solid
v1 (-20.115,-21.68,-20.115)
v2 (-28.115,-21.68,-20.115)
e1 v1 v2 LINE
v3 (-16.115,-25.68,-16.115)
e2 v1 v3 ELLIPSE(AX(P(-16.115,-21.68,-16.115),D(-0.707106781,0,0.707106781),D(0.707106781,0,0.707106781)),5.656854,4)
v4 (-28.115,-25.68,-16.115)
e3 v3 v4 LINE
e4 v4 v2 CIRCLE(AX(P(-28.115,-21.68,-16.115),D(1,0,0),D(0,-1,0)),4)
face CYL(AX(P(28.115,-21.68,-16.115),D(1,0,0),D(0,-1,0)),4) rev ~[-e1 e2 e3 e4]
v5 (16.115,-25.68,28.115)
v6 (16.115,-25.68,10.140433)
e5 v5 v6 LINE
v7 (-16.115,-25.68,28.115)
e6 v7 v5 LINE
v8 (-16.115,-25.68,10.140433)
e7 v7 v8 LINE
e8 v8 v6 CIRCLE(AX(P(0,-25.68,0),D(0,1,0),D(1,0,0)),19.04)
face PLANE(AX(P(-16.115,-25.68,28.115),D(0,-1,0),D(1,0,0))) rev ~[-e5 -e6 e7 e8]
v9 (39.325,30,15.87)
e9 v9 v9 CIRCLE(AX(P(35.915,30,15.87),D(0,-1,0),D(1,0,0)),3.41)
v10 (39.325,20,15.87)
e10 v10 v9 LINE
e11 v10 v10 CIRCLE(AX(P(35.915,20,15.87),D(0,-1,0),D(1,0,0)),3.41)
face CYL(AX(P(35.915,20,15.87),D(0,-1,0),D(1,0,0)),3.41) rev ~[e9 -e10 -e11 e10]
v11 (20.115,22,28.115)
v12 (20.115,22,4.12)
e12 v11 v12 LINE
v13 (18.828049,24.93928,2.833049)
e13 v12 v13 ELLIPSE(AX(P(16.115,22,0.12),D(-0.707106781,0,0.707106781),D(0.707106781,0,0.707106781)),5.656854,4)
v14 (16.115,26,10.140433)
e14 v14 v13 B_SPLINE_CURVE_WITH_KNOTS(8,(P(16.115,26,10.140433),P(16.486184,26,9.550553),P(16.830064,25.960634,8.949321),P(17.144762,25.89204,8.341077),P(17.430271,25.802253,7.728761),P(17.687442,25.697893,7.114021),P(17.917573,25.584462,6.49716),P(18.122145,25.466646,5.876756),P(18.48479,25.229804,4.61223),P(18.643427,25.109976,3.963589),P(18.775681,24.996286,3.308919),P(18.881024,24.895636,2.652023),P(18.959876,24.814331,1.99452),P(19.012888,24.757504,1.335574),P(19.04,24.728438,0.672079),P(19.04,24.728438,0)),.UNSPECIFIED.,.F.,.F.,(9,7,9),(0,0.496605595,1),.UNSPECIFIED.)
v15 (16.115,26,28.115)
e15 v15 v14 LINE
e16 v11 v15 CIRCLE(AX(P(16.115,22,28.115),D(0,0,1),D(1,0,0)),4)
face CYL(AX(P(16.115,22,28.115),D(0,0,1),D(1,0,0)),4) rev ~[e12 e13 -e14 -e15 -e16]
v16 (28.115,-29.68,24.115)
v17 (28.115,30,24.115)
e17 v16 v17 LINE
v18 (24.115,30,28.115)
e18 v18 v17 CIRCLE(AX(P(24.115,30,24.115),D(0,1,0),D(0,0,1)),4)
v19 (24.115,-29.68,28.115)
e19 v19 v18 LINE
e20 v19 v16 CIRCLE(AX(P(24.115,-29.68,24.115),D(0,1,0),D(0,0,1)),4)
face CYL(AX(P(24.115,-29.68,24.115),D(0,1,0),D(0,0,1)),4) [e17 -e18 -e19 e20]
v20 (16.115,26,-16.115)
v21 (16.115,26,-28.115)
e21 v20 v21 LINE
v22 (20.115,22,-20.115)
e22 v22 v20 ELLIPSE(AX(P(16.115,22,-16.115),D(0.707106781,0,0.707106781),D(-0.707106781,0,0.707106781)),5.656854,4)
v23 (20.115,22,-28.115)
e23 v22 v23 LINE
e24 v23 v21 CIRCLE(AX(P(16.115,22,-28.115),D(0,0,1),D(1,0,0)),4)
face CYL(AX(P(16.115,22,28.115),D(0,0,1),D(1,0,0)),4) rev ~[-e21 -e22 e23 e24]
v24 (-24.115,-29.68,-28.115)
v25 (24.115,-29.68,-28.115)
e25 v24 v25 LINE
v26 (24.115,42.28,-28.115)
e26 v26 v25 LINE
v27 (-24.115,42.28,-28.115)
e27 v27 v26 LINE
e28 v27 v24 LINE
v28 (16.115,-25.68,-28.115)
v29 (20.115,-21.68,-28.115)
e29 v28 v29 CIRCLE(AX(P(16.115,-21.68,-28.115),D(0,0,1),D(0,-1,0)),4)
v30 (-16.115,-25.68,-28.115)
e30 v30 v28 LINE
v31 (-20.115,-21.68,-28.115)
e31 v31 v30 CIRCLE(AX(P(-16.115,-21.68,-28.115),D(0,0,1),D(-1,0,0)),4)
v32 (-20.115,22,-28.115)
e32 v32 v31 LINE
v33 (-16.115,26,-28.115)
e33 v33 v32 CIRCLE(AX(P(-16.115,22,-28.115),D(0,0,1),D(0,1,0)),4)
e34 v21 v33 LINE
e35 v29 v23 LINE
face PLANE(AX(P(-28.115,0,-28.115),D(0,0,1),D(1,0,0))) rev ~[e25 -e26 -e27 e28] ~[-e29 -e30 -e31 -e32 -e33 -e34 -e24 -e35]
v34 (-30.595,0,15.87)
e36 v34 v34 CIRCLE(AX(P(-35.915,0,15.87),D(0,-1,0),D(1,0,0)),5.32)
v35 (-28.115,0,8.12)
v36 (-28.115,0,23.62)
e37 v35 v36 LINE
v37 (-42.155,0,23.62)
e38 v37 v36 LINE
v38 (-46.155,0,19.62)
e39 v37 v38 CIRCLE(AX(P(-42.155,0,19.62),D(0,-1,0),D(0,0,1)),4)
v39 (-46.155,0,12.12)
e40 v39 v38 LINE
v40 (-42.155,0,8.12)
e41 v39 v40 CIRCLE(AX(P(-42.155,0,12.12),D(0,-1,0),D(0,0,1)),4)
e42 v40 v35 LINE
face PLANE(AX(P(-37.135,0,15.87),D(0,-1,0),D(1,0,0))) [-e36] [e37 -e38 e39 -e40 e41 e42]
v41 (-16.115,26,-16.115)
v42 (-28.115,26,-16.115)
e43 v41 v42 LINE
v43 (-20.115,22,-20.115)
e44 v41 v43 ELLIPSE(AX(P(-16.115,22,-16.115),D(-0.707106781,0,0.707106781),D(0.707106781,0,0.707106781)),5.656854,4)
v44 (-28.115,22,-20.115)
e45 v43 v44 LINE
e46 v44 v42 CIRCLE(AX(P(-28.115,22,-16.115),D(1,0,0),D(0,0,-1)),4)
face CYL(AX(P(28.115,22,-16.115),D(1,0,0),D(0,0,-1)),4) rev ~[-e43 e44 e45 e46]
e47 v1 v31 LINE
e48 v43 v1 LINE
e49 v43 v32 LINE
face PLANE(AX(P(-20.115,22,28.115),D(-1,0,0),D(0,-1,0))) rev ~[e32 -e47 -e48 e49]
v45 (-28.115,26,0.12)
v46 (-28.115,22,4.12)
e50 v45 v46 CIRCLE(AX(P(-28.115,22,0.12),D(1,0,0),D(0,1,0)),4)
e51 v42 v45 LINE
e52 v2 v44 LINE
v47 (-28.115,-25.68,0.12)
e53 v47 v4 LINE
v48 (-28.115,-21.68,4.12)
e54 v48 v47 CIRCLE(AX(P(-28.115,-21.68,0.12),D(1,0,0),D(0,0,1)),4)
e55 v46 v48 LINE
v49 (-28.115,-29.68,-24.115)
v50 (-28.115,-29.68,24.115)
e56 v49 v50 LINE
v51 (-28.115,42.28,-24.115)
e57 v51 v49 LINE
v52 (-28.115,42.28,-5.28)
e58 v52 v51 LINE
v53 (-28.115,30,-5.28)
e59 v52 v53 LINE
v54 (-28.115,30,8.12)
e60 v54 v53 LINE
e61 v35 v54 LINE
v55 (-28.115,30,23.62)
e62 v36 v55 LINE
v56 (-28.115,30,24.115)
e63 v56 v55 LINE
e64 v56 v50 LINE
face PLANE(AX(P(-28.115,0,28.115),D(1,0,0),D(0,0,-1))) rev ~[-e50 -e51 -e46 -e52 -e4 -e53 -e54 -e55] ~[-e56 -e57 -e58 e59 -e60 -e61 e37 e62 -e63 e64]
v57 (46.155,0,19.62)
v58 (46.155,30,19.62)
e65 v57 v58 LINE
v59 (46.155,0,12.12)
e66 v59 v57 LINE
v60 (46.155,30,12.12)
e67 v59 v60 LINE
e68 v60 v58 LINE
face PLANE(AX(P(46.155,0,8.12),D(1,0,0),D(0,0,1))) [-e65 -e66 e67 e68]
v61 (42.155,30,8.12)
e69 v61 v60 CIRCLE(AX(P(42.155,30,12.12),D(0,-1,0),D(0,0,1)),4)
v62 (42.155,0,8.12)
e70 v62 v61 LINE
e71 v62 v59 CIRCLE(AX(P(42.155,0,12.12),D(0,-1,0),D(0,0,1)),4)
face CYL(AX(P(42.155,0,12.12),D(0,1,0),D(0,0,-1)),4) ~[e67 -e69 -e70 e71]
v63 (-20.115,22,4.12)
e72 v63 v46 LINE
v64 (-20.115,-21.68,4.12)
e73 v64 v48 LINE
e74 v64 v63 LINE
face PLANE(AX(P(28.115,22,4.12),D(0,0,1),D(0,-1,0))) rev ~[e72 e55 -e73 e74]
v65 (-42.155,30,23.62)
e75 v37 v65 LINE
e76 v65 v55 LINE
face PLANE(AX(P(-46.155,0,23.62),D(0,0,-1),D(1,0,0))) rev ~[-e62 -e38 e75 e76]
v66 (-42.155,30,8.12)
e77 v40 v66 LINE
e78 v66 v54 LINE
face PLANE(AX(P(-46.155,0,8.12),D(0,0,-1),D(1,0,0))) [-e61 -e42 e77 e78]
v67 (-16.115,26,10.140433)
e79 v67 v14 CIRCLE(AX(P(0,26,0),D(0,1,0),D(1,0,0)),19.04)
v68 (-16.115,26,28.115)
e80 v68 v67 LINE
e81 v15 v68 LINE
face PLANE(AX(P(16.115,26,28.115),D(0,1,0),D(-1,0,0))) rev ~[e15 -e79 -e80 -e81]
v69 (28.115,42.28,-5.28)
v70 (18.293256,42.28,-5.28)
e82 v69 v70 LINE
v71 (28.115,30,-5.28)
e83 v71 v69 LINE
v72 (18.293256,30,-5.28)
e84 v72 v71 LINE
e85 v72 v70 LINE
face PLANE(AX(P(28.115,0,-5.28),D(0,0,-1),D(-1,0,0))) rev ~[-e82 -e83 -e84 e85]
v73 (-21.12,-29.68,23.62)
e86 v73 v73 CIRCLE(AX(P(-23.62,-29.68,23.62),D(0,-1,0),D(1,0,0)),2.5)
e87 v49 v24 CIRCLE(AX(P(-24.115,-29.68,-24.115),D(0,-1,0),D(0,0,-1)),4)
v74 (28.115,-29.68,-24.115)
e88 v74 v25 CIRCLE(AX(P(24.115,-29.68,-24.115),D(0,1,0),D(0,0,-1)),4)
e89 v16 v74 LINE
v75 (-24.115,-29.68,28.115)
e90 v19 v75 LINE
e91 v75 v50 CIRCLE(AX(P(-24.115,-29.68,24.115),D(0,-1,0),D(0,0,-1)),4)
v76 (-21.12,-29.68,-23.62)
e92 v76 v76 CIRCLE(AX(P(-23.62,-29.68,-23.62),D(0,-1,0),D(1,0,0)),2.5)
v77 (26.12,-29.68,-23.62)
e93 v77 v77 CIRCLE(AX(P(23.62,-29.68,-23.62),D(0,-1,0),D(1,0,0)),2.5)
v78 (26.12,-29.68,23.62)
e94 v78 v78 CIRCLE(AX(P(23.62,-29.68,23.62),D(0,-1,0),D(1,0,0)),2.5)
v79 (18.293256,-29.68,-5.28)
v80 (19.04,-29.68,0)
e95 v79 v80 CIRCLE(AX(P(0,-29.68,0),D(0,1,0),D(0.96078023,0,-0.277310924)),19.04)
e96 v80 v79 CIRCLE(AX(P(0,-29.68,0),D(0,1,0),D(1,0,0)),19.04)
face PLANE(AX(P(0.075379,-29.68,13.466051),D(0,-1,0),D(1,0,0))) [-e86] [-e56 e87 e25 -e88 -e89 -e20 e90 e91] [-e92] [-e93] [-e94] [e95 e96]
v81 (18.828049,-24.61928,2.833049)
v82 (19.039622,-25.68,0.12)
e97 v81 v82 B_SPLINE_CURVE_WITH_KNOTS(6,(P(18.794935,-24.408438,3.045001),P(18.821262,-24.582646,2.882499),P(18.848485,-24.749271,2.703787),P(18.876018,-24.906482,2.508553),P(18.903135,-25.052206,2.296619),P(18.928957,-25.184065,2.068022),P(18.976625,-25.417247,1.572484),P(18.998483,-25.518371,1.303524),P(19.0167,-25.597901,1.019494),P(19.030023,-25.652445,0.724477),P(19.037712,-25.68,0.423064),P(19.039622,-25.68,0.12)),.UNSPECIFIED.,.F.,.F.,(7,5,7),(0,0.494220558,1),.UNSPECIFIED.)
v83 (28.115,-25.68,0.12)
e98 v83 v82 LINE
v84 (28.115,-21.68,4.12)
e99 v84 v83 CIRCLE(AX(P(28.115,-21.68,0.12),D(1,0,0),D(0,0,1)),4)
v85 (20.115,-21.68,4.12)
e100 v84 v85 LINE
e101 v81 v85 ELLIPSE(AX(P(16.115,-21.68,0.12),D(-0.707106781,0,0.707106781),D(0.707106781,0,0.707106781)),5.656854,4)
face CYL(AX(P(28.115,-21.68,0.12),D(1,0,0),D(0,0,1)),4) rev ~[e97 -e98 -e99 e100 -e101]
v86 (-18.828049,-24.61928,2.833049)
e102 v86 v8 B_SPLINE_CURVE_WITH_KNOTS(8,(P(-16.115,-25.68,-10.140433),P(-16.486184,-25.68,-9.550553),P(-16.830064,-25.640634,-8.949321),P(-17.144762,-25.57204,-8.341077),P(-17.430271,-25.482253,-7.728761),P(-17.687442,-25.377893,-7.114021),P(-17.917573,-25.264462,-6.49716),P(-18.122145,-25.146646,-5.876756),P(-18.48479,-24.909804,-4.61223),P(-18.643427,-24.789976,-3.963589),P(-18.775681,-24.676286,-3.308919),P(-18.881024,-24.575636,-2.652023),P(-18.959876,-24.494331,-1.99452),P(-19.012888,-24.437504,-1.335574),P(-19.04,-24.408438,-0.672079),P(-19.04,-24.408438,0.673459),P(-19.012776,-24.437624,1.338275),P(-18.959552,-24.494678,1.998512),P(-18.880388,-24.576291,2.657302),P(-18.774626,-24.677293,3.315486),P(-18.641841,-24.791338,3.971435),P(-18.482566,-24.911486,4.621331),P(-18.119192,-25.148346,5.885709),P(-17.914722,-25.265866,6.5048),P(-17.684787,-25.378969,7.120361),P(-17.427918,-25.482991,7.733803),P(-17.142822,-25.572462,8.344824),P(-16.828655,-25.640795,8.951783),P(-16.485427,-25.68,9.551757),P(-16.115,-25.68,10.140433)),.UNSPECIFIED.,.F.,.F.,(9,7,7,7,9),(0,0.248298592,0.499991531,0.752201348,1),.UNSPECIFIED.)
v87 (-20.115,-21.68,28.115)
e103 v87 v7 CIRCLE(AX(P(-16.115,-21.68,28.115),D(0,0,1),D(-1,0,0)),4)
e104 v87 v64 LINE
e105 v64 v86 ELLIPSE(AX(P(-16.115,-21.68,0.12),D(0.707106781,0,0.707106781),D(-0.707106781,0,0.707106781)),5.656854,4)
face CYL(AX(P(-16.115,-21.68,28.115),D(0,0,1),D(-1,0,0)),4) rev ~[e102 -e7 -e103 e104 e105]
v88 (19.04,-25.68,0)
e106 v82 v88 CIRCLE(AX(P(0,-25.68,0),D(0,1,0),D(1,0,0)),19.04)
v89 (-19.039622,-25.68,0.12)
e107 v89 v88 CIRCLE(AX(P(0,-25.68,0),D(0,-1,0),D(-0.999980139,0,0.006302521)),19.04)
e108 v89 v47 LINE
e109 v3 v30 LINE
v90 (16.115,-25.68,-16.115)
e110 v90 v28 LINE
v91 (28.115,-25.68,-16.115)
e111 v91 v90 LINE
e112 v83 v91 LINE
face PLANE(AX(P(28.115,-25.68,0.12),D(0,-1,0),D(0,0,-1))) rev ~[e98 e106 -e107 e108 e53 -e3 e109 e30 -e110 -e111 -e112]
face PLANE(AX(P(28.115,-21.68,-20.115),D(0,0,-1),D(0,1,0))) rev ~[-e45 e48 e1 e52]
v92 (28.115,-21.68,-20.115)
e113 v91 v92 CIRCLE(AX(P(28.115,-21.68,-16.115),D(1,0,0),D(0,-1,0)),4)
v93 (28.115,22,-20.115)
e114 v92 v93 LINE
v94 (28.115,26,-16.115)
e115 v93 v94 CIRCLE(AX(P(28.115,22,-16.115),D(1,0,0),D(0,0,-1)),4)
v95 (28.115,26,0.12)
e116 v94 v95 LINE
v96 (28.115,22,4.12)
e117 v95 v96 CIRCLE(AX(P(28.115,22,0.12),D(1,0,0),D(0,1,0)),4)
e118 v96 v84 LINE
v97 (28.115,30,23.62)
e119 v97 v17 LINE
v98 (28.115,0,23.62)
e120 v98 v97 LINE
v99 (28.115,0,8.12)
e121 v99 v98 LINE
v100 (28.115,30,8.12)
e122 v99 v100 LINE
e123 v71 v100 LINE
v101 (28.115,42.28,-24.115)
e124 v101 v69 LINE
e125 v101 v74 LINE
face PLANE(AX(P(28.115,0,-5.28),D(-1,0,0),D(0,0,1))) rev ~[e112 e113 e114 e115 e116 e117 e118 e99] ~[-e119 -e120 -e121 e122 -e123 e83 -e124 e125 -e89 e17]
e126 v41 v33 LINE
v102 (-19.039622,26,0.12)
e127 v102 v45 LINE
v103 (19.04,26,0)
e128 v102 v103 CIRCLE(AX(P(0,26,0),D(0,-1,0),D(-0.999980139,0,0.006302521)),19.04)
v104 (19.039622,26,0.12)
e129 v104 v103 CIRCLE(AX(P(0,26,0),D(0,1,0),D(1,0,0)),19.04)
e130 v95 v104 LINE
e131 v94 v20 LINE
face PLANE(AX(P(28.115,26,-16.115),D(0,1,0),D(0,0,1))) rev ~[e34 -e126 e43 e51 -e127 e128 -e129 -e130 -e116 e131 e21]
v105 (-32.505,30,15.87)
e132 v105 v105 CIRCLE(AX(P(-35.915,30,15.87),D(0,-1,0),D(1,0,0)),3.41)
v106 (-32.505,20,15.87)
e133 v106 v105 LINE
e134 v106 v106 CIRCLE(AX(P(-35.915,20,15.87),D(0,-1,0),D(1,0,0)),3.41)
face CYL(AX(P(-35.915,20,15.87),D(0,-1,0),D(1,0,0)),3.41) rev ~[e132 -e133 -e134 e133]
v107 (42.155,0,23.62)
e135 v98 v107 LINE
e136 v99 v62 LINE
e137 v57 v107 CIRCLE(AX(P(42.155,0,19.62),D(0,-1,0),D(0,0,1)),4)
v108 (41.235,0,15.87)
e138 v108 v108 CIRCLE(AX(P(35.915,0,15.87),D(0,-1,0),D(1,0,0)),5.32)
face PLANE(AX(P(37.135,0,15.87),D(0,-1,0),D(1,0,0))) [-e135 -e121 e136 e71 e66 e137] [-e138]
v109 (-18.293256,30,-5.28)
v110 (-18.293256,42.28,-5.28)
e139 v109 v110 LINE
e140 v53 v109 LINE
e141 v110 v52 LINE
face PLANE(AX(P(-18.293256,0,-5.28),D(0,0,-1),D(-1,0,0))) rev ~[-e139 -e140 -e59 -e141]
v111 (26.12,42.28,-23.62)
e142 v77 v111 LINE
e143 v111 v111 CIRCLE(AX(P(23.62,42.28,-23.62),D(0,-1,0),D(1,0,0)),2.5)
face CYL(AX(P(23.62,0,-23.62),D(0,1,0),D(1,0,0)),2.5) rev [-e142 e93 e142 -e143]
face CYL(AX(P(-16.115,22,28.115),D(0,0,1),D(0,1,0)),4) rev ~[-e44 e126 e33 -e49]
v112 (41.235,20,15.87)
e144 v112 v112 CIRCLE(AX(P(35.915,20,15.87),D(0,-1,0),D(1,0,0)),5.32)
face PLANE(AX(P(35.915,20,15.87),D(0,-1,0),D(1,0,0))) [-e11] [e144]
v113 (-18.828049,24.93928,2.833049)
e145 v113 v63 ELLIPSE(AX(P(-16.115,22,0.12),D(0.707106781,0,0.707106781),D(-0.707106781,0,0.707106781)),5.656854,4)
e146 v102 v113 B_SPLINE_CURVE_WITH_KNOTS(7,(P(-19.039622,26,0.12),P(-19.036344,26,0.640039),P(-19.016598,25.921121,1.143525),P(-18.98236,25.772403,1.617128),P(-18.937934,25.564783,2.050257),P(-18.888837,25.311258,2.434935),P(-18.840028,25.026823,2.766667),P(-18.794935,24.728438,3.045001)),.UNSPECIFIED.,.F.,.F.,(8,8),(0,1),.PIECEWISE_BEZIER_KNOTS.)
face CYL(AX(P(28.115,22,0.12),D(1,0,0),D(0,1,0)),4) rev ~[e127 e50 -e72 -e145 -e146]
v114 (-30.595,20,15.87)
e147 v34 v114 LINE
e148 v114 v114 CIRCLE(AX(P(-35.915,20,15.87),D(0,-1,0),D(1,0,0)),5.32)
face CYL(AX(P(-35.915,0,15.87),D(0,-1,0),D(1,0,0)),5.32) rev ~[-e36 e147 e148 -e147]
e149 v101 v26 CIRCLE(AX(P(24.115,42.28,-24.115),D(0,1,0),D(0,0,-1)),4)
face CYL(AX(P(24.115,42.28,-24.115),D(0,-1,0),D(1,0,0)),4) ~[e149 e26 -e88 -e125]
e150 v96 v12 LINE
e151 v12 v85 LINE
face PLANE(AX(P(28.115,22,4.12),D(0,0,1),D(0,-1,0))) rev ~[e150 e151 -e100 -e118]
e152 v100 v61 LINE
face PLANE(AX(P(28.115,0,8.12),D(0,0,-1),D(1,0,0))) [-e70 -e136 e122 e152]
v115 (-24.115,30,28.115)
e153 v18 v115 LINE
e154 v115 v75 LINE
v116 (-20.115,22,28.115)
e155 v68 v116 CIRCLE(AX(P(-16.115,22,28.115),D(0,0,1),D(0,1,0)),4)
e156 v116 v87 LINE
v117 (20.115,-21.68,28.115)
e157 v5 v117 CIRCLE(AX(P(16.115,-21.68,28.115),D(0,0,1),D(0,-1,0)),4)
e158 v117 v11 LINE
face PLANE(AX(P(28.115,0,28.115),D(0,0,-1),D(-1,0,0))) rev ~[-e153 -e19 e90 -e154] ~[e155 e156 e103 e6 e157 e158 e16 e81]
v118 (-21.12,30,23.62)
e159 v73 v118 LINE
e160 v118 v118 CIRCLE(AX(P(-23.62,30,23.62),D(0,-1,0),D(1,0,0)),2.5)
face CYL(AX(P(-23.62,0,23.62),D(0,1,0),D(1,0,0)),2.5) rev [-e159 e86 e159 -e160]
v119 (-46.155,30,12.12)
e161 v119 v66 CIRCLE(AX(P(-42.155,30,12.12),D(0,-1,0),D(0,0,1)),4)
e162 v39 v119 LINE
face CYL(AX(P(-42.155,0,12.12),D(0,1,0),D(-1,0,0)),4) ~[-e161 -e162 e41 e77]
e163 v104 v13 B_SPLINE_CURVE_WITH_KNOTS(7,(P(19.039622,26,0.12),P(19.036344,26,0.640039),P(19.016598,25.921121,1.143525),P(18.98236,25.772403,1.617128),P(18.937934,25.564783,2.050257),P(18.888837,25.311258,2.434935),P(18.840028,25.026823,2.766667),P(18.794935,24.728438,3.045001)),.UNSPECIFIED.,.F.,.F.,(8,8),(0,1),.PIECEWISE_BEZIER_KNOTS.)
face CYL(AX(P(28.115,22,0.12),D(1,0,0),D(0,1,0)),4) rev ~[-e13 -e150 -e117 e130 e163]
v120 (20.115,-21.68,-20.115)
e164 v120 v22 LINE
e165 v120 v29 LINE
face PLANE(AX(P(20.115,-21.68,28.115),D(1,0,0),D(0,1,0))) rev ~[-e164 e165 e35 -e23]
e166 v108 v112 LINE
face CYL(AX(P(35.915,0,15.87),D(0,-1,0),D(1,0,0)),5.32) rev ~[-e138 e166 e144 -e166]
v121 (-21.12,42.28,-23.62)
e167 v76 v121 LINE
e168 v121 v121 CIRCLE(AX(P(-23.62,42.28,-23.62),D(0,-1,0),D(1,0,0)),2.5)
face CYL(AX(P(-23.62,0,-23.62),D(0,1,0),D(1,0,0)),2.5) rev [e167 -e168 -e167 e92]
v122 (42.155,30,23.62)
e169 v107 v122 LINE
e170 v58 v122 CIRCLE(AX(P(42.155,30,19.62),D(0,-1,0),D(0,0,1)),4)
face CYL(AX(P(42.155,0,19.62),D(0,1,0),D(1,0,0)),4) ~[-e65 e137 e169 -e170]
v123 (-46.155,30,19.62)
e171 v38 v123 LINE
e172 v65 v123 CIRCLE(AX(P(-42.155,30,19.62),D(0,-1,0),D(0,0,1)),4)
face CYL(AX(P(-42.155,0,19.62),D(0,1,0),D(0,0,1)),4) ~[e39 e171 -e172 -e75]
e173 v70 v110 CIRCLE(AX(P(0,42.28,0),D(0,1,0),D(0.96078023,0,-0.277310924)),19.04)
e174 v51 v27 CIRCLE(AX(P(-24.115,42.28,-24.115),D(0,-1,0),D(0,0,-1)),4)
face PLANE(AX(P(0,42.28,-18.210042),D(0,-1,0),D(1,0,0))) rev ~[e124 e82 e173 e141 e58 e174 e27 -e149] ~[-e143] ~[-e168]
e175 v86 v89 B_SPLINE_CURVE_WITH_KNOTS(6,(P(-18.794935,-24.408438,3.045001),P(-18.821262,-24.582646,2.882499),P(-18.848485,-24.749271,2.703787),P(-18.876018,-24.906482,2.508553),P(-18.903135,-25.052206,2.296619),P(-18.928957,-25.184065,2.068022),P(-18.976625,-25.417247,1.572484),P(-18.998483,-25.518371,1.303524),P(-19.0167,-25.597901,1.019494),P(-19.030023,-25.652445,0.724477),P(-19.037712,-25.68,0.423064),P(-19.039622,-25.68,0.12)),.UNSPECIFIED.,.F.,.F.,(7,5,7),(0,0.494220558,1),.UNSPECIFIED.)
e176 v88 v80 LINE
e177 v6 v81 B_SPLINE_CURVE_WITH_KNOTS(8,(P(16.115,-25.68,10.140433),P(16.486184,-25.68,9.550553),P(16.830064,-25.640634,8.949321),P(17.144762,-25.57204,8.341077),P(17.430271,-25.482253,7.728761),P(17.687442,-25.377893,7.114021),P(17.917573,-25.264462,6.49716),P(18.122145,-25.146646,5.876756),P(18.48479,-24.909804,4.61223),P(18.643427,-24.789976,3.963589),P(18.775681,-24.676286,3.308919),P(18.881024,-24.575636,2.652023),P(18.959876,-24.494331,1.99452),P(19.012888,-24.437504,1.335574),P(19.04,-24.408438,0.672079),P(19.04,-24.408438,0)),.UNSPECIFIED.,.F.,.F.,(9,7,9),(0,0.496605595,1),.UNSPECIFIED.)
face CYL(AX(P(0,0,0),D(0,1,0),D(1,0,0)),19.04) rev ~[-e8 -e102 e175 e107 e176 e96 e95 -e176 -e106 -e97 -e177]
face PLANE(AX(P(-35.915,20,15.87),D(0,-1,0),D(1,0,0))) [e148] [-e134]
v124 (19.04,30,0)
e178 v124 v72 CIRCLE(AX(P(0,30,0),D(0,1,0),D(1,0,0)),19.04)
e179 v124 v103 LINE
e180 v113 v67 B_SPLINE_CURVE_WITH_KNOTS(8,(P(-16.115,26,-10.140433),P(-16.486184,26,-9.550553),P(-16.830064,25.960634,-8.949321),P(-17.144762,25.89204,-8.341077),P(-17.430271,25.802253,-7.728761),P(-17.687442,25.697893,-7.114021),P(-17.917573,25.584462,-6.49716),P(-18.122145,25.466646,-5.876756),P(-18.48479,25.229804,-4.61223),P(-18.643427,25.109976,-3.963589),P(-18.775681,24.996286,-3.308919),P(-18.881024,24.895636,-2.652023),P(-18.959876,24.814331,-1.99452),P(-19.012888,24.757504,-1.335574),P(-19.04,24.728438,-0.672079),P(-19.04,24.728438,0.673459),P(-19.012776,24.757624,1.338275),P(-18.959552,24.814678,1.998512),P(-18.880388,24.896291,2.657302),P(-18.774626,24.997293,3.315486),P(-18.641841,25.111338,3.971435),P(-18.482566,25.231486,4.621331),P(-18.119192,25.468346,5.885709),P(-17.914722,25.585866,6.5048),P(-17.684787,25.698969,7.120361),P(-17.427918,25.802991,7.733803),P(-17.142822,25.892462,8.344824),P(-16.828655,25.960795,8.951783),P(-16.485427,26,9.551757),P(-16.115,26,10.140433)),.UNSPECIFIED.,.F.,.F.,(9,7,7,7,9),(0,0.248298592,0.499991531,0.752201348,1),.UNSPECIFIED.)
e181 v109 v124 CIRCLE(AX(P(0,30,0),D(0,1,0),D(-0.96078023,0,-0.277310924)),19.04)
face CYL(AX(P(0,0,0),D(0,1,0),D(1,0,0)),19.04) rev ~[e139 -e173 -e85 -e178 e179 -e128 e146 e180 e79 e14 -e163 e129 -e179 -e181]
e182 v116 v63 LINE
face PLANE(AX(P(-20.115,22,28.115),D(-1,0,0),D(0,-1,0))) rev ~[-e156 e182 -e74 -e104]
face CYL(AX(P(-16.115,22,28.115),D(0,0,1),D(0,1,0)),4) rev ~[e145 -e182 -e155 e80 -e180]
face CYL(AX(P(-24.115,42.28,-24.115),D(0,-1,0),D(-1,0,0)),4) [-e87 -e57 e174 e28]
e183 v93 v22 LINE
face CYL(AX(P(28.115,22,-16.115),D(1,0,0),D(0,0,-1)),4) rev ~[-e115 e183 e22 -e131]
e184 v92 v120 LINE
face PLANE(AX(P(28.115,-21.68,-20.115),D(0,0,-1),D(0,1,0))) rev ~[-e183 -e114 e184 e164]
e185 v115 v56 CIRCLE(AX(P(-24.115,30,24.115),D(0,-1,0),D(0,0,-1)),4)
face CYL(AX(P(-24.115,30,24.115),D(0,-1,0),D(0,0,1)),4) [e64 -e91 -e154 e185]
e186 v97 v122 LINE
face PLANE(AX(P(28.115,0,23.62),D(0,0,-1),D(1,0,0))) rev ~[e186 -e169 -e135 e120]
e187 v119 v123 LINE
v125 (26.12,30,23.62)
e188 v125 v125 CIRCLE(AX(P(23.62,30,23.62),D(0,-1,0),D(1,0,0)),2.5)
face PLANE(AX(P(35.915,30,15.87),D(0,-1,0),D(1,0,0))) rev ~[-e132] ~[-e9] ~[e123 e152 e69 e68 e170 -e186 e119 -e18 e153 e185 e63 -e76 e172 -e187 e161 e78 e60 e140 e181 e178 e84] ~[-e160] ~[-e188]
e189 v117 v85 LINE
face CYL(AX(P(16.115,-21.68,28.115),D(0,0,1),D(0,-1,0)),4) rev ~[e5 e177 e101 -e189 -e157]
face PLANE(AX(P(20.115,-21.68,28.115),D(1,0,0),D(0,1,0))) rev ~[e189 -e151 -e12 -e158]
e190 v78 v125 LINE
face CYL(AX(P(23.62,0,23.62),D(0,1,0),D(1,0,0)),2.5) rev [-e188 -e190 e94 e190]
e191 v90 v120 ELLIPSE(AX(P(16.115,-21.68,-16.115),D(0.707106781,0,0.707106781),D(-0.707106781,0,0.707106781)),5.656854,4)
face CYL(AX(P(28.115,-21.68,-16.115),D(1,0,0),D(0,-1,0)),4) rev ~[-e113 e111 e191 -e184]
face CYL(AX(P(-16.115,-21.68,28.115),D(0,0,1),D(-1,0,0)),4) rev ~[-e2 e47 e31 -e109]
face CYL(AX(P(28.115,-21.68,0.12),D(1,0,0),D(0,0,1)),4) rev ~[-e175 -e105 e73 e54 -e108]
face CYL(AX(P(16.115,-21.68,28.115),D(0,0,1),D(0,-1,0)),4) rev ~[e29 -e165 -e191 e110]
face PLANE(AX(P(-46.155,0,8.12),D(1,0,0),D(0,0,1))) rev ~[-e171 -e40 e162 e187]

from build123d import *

# Parameters (mm, degrees)
F3_R          = 2.5
F4_DEPTH      = 42.28
F4_DEPTH_BACK = 29.68
F5_DEPTH      = 30
F5_DEPTH_BACK = 29.68
F3_W          = 18.04
F3_H          = 15.5
F3_R_2        = 5.32
F8_DEPTH      = 30
F9_START      = -20
F1_R          = 5.32
F1_R_2        = 3.41
F9_DEPTH      = 10
F10_R         = 4
F12_DEPTH     = 56.231
F14_DEPTH     = 74.271


# Not quite as in the source:
# - a feature of the source that left no trace in its solid (it failed there, or was rolled back) is left out


with BuildPart() as f4:
    # F3 (on Front) → F4 (new body, two sides)
    with BuildSketch(Plane.XZ) as f4_sk:
        with BuildLine():
            Line((-18.2932555878, -5.28), (-28.115, -5.28))
            Line((-28.115, -5.28), (-28.115, -28.115))
            Line((-28.115, -28.115), (28.115, -28.115))
            Line((28.115, -28.115), (28.115, -5.28))
            Line((28.115, -5.28), (18.2932555878, -5.28))
            ThreePointArc((18.2932555878, -5.28), (0, -19.04), (-18.2932555878, -5.28))
        make_face()
        with Locations((-23.62, -23.62)):
            Circle(F3_R, mode=Mode.SUBTRACT)
        with Locations((23.62, -23.62)):
            Circle(F3_R, mode=Mode.SUBTRACT)
    extrude(amount=-F4_DEPTH)
    extrude(f4_sk.sketch, amount=F4_DEPTH_BACK)

    # F3 (on Front) → F5 (join, two sides)
    with BuildSketch(Plane.XZ) as f5_sk:
        with BuildLine():
            Line((28.115, 28.115), (-28.115, 28.115))
            Line((-28.115, 28.115), (-28.115, 23.62))
            Line((-28.115, 23.62), (-28.115, 8.12))
            Line((-28.115, 8.12), (-28.115, -5.28))
            Line((-28.115, -5.28), (-18.2932555878, -5.28))
            ThreePointArc((-18.2932555878, -5.28), (-2.6662720799, 18.8523895885), (19.04, 0))
            ThreePointArc((19.04, 0), (18.8523895885, -2.6662720799), (18.2932555878, -5.28))
            Line((18.2932555878, -5.28), (28.115, -5.28))
            Line((28.115, -5.28), (28.115, 8.12))
            Line((28.115, 8.12), (28.115, 23.62))
            Line((28.115, 23.62), (28.115, 28.115))
        make_face()
        with Locations((-23.62, 23.62)):
            Circle(F3_R, mode=Mode.SUBTRACT)
        with Locations((23.62, 23.62)):
            Circle(F3_R, mode=Mode.SUBTRACT)
    extrude(amount=-F5_DEPTH)
    extrude(f5_sk.sketch, amount=F5_DEPTH_BACK)

    # F3 (on Front) → F8 (join)
    with BuildSketch(Plane.XZ):
        with Locations((37.135, 15.87)):
            Rectangle(F3_W, F3_H)
        with Locations((35.915, 15.87)):
            Circle(F3_R_2, mode=Mode.SUBTRACT)
        with Locations((-37.135, 15.87)):
            Rectangle(F3_W, F3_H)
        with Locations((-35.915, 15.87)):
            Circle(F3_R_2, mode=Mode.SUBTRACT)
    extrude(amount=-F8_DEPTH)

    # F1 (on Front) → F9 (join)
    with BuildSketch(Plane.XZ.offset(F9_START)):
        with Locations((35.915, 15.87)):
            Circle(F1_R)
        with Locations((35.915, 15.87)):
            Circle(F1_R_2, mode=Mode.SUBTRACT)
        with Locations((-35.915, 15.87)):
            Circle(F1_R)
        with Locations((-35.915, 15.87)):
            Circle(F1_R_2, mode=Mode.SUBTRACT)
    extrude(amount=-F9_DEPTH)

    # F10
    f10_edges = [f4.edges().sort_by_distance(p)[0] for p in [
        (-46.155, 15, 23.62),
        (-46.155, 15, 8.12),
        (-28.115, 6.3, -28.115),
        (28.115, 6.3, -28.115),
        (46.155, 15, 8.12),
        (46.155, 15, 23.62),
        (28.115, 0.16, 28.115),
        (-28.115, 0.16, 28.115),
    ]]
    fillet(f10_edges, radius=F10_R)

    # F11 (on face) → F12 (cut, through all)
    with BuildSketch(Plane.XY.offset(28.115)):
        with BuildLine():
            Line((16.115, 26), (-16.115, 26))
            ThreePointArc((-16.115, 26), (-18.9434271247, 24.8284271247), (-20.115, 22))
            Line((-20.115, 22), (-20.115, -21.68))
            ThreePointArc((-20.115, -21.68), (-18.9434271247, -24.5084271247), (-16.115, -25.68))
            Line((-16.115, -25.68), (16.115, -25.68))
            ThreePointArc((16.115, -25.68), (18.9434271247, -24.5084271247), (20.115, -21.68))
            Line((20.115, -21.68), (20.115, 22))
            ThreePointArc((20.115, 22), (18.9434271247, 24.8284271247), (16.115, 26))
        make_face()
    extrude(amount=-F12_DEPTH, mode=Mode.SUBTRACT)

    # F13 (on face) → F14 (cut, through all)
    with BuildSketch(Plane.YZ.offset(28.115)):
        with BuildLine():
            Line((22, 4.12), (-21.68, 4.12))
            ThreePointArc((-21.68, 4.12), (-24.5084271247, 2.9484271247), (-25.68, 0.12))
            Line((-25.68, 0.12), (-25.68, -16.115))
            ThreePointArc((-25.68, -16.115), (-24.5084271247, -18.9434271247), (-21.68, -20.115))
            Line((-21.68, -20.115), (22, -20.115))
            ThreePointArc((22, -20.115), (24.8284271247, -18.9434271247), (26, -16.115))
            Line((26, -16.115), (26, 0.12))
            ThreePointArc((26, 0.12), (24.8284271247, 2.9484271247), (22, 4.12))
        make_face()
    extrude(amount=-F14_DEPTH, mode=Mode.SUBTRACT)


solid = f4.part
